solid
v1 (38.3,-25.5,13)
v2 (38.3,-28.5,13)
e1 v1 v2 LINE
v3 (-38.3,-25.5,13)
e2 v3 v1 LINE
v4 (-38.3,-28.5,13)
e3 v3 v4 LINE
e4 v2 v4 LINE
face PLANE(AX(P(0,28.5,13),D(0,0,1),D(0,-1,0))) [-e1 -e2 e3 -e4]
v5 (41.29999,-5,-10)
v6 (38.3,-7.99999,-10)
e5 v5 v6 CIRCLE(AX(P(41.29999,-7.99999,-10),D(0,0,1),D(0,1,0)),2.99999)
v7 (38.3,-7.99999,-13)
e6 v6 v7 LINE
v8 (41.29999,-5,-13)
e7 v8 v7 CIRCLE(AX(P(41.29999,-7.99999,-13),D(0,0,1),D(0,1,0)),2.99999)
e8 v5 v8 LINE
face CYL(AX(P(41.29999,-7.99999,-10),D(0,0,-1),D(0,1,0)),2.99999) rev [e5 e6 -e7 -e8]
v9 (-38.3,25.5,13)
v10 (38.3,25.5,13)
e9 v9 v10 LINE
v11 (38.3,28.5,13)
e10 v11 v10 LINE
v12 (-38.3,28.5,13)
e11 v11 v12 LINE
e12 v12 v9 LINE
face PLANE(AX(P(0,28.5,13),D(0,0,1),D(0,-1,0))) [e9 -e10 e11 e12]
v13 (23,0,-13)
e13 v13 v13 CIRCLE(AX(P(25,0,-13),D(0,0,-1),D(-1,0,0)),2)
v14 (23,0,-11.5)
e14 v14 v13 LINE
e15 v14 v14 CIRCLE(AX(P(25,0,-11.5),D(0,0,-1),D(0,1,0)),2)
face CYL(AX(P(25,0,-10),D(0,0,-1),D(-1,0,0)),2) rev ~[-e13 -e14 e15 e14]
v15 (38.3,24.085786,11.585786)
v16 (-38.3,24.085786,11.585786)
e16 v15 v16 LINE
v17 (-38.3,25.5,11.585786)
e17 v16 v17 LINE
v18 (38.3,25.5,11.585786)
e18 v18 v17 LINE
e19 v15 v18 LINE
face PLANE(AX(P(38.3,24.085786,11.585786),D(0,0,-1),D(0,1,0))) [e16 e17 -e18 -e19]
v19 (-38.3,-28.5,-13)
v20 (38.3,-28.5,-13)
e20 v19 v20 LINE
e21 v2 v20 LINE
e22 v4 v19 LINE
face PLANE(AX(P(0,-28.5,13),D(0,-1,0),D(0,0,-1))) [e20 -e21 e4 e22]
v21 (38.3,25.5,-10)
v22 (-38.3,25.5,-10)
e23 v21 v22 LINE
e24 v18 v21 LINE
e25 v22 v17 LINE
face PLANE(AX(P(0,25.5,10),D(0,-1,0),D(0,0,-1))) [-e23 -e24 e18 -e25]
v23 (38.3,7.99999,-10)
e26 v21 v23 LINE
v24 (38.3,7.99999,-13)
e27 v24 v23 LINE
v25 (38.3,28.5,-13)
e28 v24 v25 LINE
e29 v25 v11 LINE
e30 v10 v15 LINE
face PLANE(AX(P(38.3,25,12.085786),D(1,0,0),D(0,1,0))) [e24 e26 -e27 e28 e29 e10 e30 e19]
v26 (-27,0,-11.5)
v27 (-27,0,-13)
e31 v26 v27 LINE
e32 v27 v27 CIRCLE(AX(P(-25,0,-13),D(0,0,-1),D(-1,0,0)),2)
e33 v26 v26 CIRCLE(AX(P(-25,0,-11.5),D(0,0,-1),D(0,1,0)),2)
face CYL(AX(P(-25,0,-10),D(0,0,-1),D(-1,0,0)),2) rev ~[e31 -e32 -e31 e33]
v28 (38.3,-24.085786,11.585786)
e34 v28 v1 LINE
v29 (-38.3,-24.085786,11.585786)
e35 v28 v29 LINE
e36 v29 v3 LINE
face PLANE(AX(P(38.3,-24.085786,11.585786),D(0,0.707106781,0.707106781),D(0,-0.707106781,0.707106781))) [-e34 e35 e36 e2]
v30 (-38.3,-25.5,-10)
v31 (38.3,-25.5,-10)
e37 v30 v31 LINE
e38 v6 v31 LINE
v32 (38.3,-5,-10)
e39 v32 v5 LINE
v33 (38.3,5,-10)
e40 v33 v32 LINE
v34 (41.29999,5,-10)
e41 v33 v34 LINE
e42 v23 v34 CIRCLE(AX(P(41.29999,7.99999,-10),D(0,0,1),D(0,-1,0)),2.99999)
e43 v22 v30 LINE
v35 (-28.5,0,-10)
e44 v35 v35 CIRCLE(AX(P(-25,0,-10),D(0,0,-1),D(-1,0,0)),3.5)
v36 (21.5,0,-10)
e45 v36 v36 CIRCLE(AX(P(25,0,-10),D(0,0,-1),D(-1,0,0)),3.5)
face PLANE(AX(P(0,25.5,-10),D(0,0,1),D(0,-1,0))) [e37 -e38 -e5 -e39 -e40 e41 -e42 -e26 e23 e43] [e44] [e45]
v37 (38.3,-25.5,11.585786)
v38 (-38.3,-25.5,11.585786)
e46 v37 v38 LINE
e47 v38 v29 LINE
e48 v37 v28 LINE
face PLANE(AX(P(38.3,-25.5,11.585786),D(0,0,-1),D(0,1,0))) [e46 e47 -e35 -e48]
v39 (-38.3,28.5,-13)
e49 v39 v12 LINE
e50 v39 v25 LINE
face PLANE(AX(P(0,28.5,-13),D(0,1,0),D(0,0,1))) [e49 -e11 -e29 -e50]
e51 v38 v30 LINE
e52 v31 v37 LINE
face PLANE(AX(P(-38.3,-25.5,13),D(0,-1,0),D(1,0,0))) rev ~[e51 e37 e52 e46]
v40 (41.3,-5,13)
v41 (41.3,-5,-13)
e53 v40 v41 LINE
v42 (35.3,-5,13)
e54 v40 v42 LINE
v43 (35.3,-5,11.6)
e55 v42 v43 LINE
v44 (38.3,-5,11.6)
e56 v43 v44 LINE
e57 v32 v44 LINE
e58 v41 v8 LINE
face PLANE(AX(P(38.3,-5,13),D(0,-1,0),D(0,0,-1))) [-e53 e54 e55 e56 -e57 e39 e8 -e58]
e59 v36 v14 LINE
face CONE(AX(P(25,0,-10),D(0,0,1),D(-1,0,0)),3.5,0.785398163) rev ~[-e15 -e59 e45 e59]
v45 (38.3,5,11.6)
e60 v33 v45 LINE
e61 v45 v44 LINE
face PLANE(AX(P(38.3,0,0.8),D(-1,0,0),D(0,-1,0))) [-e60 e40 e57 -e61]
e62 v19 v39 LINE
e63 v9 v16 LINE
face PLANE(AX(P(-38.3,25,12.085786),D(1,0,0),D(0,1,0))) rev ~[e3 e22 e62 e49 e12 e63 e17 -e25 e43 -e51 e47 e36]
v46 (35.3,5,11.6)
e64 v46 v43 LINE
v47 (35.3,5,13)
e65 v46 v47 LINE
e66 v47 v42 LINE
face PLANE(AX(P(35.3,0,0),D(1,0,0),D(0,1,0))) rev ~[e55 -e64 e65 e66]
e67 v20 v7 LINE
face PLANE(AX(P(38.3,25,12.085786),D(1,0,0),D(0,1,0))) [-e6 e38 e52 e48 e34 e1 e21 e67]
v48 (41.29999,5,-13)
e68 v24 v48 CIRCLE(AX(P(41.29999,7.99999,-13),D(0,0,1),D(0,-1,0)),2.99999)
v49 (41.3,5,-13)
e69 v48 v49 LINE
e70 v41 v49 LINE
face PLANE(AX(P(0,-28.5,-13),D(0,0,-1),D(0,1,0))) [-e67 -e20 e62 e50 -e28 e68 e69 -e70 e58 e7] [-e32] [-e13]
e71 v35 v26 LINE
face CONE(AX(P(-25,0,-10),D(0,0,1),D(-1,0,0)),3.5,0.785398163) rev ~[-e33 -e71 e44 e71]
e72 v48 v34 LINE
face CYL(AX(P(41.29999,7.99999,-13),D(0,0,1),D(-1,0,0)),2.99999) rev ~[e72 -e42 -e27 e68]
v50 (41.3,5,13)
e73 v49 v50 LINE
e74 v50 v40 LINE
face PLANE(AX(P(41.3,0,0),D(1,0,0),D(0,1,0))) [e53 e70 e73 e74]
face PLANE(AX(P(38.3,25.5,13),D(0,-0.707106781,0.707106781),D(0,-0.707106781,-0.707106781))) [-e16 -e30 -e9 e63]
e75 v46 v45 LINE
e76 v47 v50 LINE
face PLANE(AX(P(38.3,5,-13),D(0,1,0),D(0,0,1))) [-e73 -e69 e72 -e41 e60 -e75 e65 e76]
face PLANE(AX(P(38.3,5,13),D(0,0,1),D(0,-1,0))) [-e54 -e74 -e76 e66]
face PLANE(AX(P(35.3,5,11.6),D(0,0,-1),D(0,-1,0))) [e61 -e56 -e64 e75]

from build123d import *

# Parameters (mm, degrees)
F1_DEPTH        = 38.3
F2_W            = 76.6
F2_H            = 51
F3_DEPTH        = 19.6
F5_DEPTH        = 76.6
F7_DEPTH        = 3
F8_W            = 10
F8_H            = 21.6
F9_DEPTH        = 3
F10_R           = 2.99999
F12_D           = 4
F12_CSINK_D     = 7
F12_CSINK_ANGLE = 90


# Not quite as in the source:
# - a fillet or chamfer is up to 0.001 mm smaller than in the source, because OpenCascade refuses the exact size


with BuildPart() as f1:
    # F0 (on Right) → F1 (new body, symmetric)
    with BuildSketch(Plane.YZ):
        Polygon((-28.5, 13), (-28.5, -13), (-5, -13), (0, -13), (5, -13), (28.5, -13), (28.5, 13), (5, 13), (-5, 13), align=None)
        Polygon((-5, -10), (-25.5, -10), (-25.5, 10), (-5, 10), (5, 10), (25.5, 10), (25.5, -10), (5, -10), align=None, mode=Mode.SUBTRACT)
    extrude(amount=F1_DEPTH, both=True)

    # F2 (on face) → F3 (cut)
    with BuildSketch(Plane.XY.offset(13)):
        Rectangle(F2_W, F2_H)
    extrude(amount=-F3_DEPTH, mode=Mode.SUBTRACT)

    # F4 (on face) → F5 (join)
    with BuildSketch(Plane.YZ.offset(38.3)):
        Polygon((24.0857864376, 11.5857864376), (25.5, 11.5857864376), (25.5, 13), align=None)
        Polygon((-24.0857864376, 11.5857864376), (-25.5, 13), (-25.5, 11.5857864376), align=None)
    extrude(amount=-F5_DEPTH)

    # F6 (on face) → F7 (join, symmetric)
    with BuildSketch(Plane.YZ.offset(38.3)):
        Polygon((-5, -13), (0, -13), (5, -13), (5, 13), (-5, 13), align=None)
    extrude(amount=F7_DEPTH, both=True)

    # F8 (on face) → F9 (cut)
    with BuildSketch(Plane(origin=(35.3, 0, 0), x_dir=(0, -1, 0), z_dir=(-1, 0, 0))):
        with Locations((0, 0.8)):
            Rectangle(F8_W, F8_H)
    extrude(amount=-F9_DEPTH, mode=Mode.SUBTRACT)

    # F10 (radius 3 in the source; OpenCascade refuses exactly that, so slightly less here)
    f10_edges = [f1.edges().sort_by_distance(p)[0] for p in [
        (38.3, -5, -11.5),
        (38.3, 5, -11.5),
    ]]
    fillet(f10_edges, radius=F10_R)

    # F12 (through all)
    with Locations(Plane.XY.offset(-10)):
        with Locations((-25, 0), (25, 0)):
            CounterSinkHole(F12_D / 2, F12_CSINK_D / 2, counter_sink_angle=F12_CSINK_ANGLE)


solid = f1.part
